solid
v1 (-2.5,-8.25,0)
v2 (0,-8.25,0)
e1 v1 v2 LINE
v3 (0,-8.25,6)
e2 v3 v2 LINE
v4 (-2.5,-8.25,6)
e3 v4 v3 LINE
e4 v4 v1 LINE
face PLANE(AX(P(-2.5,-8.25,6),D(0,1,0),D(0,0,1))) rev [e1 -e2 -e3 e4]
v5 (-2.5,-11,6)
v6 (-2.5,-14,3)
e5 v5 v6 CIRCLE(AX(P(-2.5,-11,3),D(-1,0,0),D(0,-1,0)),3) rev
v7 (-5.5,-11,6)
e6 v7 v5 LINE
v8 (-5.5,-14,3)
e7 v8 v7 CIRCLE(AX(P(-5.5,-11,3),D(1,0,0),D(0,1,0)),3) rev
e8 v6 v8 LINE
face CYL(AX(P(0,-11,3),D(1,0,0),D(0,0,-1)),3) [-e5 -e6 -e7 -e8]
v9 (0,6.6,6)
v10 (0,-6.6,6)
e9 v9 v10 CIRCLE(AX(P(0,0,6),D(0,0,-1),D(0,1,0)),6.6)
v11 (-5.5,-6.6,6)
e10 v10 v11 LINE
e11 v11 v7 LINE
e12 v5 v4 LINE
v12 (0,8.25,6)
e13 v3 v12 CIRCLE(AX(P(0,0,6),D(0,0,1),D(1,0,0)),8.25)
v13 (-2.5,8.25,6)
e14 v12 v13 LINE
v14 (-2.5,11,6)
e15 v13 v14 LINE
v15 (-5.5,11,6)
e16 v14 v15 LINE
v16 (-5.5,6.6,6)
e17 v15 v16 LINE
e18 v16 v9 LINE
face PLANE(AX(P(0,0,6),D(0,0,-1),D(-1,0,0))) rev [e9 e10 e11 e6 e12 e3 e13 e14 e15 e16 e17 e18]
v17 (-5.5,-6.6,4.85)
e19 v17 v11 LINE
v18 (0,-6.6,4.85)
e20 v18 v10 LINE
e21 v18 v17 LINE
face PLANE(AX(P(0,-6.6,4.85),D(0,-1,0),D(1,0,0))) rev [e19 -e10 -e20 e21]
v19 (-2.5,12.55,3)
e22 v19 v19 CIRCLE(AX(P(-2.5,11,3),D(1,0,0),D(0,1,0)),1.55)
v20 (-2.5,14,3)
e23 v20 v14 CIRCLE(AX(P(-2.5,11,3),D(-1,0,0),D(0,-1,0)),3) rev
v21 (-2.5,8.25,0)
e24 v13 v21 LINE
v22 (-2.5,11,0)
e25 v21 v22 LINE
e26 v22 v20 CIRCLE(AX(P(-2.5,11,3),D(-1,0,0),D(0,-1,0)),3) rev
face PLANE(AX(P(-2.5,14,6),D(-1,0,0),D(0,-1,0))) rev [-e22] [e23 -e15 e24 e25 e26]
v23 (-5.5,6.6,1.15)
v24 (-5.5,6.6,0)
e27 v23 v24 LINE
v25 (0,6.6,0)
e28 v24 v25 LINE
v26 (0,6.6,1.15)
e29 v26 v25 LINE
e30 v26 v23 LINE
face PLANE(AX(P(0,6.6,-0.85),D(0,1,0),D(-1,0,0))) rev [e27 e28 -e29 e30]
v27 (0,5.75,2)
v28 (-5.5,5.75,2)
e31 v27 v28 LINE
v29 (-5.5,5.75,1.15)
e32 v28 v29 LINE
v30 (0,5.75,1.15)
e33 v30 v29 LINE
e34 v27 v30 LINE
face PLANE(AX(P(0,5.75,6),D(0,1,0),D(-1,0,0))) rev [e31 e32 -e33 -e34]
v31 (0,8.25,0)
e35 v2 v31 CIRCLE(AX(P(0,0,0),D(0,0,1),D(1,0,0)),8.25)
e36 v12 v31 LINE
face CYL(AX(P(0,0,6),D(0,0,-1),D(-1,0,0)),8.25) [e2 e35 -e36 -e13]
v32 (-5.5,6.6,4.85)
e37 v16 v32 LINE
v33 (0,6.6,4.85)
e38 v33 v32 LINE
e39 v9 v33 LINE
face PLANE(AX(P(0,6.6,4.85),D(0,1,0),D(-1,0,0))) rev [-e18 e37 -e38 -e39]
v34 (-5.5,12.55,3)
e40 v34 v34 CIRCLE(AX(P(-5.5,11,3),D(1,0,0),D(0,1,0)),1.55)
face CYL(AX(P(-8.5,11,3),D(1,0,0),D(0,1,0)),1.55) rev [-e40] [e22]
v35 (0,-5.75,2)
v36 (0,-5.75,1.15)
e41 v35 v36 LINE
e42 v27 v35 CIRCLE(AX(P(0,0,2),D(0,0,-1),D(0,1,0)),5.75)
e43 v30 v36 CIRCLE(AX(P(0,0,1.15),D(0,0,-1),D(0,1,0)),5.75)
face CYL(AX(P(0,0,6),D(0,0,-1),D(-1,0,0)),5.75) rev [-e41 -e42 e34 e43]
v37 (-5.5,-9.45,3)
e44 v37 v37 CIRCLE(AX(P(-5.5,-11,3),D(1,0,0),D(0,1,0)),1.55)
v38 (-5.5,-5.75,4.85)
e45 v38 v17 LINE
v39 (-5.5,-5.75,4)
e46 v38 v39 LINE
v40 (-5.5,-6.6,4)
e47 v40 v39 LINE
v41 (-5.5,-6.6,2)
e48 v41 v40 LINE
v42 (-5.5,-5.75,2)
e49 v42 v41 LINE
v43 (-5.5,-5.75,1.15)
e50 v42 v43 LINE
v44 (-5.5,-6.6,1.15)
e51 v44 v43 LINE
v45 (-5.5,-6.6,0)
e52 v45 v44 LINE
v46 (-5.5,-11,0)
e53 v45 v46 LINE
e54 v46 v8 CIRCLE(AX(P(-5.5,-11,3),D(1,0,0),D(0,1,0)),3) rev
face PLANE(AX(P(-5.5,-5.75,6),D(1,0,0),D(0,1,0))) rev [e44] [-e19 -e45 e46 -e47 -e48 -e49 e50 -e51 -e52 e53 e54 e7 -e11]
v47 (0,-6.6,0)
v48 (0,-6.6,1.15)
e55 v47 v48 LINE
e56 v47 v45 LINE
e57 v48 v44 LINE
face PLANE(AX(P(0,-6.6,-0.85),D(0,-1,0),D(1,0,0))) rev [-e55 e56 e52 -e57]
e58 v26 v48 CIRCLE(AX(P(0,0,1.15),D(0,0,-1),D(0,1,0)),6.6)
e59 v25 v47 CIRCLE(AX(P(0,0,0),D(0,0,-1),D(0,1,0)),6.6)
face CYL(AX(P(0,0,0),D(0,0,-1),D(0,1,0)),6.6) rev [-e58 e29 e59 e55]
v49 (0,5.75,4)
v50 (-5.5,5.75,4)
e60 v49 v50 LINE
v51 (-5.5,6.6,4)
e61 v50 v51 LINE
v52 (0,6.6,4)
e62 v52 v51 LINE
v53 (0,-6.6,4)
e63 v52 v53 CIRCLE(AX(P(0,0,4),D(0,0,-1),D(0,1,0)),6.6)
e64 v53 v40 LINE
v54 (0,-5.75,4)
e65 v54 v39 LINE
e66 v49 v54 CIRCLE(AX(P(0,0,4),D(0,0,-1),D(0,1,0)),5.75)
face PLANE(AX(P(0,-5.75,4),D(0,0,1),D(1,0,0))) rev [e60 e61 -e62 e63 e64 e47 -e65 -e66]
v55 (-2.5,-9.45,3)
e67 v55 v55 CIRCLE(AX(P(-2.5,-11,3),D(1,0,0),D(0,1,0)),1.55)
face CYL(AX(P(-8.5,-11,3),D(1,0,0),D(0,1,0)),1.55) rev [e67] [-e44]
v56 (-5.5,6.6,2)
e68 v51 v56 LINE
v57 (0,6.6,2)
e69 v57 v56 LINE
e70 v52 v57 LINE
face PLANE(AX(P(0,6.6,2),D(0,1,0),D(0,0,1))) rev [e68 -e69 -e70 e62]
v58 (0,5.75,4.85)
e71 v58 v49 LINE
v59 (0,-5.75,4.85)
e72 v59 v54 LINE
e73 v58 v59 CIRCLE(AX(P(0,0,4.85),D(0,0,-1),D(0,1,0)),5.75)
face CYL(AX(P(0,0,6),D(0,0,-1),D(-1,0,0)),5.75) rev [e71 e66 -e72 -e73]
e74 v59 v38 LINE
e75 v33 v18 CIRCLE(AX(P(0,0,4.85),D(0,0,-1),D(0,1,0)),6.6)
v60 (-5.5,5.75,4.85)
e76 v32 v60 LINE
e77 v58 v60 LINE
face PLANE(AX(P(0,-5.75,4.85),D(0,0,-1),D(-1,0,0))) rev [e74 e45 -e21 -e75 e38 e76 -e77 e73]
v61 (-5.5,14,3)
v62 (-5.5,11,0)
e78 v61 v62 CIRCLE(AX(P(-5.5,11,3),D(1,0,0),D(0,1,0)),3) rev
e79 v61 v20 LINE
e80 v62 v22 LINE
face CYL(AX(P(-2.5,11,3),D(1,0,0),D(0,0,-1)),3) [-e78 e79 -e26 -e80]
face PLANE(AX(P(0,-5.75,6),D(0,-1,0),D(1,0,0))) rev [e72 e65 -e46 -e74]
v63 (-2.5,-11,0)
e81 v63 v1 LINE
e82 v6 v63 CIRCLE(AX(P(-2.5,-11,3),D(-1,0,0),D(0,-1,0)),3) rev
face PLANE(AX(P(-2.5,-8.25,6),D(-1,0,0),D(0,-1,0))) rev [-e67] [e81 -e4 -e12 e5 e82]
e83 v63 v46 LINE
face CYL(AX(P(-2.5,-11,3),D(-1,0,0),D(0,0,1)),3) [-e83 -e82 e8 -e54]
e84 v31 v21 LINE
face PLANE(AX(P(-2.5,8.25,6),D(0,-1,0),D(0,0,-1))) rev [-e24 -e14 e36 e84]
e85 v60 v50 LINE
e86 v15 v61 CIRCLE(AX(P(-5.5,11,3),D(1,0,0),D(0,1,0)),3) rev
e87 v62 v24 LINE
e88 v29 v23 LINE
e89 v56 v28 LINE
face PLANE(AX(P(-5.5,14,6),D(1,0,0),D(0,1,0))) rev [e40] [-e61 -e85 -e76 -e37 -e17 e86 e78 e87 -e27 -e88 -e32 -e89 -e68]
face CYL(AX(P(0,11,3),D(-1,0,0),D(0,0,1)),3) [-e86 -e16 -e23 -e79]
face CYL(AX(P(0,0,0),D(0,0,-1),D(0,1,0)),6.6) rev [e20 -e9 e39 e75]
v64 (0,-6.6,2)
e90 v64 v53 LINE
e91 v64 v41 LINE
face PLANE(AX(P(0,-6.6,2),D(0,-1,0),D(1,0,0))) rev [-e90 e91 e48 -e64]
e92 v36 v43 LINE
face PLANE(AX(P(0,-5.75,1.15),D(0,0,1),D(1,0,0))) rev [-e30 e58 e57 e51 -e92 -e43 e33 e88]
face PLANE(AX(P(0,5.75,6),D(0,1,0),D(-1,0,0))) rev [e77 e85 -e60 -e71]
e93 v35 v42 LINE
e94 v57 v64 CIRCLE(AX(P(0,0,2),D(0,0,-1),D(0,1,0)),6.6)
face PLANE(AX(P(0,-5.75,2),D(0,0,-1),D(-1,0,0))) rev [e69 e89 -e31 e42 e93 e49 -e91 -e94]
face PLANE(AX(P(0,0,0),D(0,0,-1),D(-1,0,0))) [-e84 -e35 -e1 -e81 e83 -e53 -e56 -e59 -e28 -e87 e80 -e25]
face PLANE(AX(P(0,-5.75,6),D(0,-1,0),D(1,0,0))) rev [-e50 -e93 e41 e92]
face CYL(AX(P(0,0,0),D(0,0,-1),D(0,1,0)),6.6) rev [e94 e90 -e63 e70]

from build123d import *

# Parameters (mm, degrees)
EXTRUDE_1_DEPTH     = 6
SKETCH_2_R          = 1.55
CUT_EXTRUDE_1_DEPTH = 6
FILLET_2_R          = 3
SKETCH_3_W          = 2
SKETCH_3_H          = 0.85
CUT_EXTRUDE_2_DEPTH = 5.5
SKETCH_4_W          = 1.15
SKETCH_4_H          = 0.85
SKETCH_4_W_2        = 2


with BuildPart() as part:
    # 草图1 → 凸台-拉伸1 (new body)
    with BuildSketch(Plane.XY):
        with BuildLine():
            Line((-5.5, 14), (-5.5, 5.75))
            Line((-5.5, 5.75), (0, 5.75))
            ThreePointArc((0, 5.75), (5.75, 0), (0, -5.75))
            Line((0, -5.75), (-5.5, -5.75))
            Line((-5.5, -5.75), (-5.5, -14))
            Line((-5.5, -14), (-2.5, -14))
            Line((-2.5, -14), (-2.5, -8.25))
            Line((-2.5, -8.25), (0, -8.25))
            ThreePointArc((0, -8.25), (8.25, 0), (0, 8.25))
            Line((0, 8.25), (-2.5, 8.25))
            Line((-2.5, 8.25), (-2.5, 14))
            Line((-2.5, 14), (-5.5, 14))
        make_face()
    extrude(amount=EXTRUDE_1_DEPTH)

    # 草图2 → 切除-拉伸1 (cut)
    with BuildSketch(Plane(origin=(-2.5, 0, 0), x_dir=(0, 0, -1), z_dir=(1, 0, 0))):
        with Locations(Location((-3, -11, 0), (0, 0, 90))):
            Circle(SKETCH_2_R)
        with Locations(Location((-3, 11, 0), (0, 0, 90))):
            Circle(SKETCH_2_R)
    extrude(amount=-CUT_EXTRUDE_1_DEPTH, mode=Mode.SUBTRACT)

    # 圆角2
    fillet_2_edges = [part.edges().sort_by_distance(p)[0] for p in [
        (-4, -14, 0),
        (-4, -14, 6),
        (-4, 14, 0),
        (-4, 14, 6),
    ]]
    fillet(fillet_2_edges, radius=FILLET_2_R - 0.0001)  # a hair under: the kernel refuses the full size

    # 草图3 → 切除-拉伸2 (cut)
    with BuildSketch(Plane.ZY.offset(5.5)):
        with Locations((0.15, 6.175)):
            Rectangle(SKETCH_3_W, SKETCH_3_H)
        with Locations((3, 6.175)):
            Rectangle(SKETCH_3_W, SKETCH_3_H)
        with Locations((5.85, -6.175)):
            Rectangle(SKETCH_3_W, SKETCH_3_H)
        with Locations((5.85, 6.175)):
            Rectangle(SKETCH_3_W, SKETCH_3_H)
        with Locations((3, -6.175)):
            Rectangle(SKETCH_3_W, SKETCH_3_H)
        with Locations((0.15, -6.175)):
            Rectangle(SKETCH_3_W, SKETCH_3_H)
    extrude(amount=-CUT_EXTRUDE_2_DEPTH, mode=Mode.SUBTRACT)

    # 草图4 → 切除-旋转1 (revolve, cut)
    with BuildSketch(Plane.ZY):
        with Locations((5.425, 6.175)):
            Rectangle(SKETCH_4_W, SKETCH_4_H)
        with Locations((3, 6.175)):
            Rectangle(SKETCH_4_W_2, SKETCH_4_H)
        with Locations((0.575, 6.175)):
            Rectangle(SKETCH_4_W, SKETCH_4_H)
    revolve(axis=Axis((0, 0, 0), (0, 0, 1)), mode=Mode.SUBTRACT)


solid = part.part
